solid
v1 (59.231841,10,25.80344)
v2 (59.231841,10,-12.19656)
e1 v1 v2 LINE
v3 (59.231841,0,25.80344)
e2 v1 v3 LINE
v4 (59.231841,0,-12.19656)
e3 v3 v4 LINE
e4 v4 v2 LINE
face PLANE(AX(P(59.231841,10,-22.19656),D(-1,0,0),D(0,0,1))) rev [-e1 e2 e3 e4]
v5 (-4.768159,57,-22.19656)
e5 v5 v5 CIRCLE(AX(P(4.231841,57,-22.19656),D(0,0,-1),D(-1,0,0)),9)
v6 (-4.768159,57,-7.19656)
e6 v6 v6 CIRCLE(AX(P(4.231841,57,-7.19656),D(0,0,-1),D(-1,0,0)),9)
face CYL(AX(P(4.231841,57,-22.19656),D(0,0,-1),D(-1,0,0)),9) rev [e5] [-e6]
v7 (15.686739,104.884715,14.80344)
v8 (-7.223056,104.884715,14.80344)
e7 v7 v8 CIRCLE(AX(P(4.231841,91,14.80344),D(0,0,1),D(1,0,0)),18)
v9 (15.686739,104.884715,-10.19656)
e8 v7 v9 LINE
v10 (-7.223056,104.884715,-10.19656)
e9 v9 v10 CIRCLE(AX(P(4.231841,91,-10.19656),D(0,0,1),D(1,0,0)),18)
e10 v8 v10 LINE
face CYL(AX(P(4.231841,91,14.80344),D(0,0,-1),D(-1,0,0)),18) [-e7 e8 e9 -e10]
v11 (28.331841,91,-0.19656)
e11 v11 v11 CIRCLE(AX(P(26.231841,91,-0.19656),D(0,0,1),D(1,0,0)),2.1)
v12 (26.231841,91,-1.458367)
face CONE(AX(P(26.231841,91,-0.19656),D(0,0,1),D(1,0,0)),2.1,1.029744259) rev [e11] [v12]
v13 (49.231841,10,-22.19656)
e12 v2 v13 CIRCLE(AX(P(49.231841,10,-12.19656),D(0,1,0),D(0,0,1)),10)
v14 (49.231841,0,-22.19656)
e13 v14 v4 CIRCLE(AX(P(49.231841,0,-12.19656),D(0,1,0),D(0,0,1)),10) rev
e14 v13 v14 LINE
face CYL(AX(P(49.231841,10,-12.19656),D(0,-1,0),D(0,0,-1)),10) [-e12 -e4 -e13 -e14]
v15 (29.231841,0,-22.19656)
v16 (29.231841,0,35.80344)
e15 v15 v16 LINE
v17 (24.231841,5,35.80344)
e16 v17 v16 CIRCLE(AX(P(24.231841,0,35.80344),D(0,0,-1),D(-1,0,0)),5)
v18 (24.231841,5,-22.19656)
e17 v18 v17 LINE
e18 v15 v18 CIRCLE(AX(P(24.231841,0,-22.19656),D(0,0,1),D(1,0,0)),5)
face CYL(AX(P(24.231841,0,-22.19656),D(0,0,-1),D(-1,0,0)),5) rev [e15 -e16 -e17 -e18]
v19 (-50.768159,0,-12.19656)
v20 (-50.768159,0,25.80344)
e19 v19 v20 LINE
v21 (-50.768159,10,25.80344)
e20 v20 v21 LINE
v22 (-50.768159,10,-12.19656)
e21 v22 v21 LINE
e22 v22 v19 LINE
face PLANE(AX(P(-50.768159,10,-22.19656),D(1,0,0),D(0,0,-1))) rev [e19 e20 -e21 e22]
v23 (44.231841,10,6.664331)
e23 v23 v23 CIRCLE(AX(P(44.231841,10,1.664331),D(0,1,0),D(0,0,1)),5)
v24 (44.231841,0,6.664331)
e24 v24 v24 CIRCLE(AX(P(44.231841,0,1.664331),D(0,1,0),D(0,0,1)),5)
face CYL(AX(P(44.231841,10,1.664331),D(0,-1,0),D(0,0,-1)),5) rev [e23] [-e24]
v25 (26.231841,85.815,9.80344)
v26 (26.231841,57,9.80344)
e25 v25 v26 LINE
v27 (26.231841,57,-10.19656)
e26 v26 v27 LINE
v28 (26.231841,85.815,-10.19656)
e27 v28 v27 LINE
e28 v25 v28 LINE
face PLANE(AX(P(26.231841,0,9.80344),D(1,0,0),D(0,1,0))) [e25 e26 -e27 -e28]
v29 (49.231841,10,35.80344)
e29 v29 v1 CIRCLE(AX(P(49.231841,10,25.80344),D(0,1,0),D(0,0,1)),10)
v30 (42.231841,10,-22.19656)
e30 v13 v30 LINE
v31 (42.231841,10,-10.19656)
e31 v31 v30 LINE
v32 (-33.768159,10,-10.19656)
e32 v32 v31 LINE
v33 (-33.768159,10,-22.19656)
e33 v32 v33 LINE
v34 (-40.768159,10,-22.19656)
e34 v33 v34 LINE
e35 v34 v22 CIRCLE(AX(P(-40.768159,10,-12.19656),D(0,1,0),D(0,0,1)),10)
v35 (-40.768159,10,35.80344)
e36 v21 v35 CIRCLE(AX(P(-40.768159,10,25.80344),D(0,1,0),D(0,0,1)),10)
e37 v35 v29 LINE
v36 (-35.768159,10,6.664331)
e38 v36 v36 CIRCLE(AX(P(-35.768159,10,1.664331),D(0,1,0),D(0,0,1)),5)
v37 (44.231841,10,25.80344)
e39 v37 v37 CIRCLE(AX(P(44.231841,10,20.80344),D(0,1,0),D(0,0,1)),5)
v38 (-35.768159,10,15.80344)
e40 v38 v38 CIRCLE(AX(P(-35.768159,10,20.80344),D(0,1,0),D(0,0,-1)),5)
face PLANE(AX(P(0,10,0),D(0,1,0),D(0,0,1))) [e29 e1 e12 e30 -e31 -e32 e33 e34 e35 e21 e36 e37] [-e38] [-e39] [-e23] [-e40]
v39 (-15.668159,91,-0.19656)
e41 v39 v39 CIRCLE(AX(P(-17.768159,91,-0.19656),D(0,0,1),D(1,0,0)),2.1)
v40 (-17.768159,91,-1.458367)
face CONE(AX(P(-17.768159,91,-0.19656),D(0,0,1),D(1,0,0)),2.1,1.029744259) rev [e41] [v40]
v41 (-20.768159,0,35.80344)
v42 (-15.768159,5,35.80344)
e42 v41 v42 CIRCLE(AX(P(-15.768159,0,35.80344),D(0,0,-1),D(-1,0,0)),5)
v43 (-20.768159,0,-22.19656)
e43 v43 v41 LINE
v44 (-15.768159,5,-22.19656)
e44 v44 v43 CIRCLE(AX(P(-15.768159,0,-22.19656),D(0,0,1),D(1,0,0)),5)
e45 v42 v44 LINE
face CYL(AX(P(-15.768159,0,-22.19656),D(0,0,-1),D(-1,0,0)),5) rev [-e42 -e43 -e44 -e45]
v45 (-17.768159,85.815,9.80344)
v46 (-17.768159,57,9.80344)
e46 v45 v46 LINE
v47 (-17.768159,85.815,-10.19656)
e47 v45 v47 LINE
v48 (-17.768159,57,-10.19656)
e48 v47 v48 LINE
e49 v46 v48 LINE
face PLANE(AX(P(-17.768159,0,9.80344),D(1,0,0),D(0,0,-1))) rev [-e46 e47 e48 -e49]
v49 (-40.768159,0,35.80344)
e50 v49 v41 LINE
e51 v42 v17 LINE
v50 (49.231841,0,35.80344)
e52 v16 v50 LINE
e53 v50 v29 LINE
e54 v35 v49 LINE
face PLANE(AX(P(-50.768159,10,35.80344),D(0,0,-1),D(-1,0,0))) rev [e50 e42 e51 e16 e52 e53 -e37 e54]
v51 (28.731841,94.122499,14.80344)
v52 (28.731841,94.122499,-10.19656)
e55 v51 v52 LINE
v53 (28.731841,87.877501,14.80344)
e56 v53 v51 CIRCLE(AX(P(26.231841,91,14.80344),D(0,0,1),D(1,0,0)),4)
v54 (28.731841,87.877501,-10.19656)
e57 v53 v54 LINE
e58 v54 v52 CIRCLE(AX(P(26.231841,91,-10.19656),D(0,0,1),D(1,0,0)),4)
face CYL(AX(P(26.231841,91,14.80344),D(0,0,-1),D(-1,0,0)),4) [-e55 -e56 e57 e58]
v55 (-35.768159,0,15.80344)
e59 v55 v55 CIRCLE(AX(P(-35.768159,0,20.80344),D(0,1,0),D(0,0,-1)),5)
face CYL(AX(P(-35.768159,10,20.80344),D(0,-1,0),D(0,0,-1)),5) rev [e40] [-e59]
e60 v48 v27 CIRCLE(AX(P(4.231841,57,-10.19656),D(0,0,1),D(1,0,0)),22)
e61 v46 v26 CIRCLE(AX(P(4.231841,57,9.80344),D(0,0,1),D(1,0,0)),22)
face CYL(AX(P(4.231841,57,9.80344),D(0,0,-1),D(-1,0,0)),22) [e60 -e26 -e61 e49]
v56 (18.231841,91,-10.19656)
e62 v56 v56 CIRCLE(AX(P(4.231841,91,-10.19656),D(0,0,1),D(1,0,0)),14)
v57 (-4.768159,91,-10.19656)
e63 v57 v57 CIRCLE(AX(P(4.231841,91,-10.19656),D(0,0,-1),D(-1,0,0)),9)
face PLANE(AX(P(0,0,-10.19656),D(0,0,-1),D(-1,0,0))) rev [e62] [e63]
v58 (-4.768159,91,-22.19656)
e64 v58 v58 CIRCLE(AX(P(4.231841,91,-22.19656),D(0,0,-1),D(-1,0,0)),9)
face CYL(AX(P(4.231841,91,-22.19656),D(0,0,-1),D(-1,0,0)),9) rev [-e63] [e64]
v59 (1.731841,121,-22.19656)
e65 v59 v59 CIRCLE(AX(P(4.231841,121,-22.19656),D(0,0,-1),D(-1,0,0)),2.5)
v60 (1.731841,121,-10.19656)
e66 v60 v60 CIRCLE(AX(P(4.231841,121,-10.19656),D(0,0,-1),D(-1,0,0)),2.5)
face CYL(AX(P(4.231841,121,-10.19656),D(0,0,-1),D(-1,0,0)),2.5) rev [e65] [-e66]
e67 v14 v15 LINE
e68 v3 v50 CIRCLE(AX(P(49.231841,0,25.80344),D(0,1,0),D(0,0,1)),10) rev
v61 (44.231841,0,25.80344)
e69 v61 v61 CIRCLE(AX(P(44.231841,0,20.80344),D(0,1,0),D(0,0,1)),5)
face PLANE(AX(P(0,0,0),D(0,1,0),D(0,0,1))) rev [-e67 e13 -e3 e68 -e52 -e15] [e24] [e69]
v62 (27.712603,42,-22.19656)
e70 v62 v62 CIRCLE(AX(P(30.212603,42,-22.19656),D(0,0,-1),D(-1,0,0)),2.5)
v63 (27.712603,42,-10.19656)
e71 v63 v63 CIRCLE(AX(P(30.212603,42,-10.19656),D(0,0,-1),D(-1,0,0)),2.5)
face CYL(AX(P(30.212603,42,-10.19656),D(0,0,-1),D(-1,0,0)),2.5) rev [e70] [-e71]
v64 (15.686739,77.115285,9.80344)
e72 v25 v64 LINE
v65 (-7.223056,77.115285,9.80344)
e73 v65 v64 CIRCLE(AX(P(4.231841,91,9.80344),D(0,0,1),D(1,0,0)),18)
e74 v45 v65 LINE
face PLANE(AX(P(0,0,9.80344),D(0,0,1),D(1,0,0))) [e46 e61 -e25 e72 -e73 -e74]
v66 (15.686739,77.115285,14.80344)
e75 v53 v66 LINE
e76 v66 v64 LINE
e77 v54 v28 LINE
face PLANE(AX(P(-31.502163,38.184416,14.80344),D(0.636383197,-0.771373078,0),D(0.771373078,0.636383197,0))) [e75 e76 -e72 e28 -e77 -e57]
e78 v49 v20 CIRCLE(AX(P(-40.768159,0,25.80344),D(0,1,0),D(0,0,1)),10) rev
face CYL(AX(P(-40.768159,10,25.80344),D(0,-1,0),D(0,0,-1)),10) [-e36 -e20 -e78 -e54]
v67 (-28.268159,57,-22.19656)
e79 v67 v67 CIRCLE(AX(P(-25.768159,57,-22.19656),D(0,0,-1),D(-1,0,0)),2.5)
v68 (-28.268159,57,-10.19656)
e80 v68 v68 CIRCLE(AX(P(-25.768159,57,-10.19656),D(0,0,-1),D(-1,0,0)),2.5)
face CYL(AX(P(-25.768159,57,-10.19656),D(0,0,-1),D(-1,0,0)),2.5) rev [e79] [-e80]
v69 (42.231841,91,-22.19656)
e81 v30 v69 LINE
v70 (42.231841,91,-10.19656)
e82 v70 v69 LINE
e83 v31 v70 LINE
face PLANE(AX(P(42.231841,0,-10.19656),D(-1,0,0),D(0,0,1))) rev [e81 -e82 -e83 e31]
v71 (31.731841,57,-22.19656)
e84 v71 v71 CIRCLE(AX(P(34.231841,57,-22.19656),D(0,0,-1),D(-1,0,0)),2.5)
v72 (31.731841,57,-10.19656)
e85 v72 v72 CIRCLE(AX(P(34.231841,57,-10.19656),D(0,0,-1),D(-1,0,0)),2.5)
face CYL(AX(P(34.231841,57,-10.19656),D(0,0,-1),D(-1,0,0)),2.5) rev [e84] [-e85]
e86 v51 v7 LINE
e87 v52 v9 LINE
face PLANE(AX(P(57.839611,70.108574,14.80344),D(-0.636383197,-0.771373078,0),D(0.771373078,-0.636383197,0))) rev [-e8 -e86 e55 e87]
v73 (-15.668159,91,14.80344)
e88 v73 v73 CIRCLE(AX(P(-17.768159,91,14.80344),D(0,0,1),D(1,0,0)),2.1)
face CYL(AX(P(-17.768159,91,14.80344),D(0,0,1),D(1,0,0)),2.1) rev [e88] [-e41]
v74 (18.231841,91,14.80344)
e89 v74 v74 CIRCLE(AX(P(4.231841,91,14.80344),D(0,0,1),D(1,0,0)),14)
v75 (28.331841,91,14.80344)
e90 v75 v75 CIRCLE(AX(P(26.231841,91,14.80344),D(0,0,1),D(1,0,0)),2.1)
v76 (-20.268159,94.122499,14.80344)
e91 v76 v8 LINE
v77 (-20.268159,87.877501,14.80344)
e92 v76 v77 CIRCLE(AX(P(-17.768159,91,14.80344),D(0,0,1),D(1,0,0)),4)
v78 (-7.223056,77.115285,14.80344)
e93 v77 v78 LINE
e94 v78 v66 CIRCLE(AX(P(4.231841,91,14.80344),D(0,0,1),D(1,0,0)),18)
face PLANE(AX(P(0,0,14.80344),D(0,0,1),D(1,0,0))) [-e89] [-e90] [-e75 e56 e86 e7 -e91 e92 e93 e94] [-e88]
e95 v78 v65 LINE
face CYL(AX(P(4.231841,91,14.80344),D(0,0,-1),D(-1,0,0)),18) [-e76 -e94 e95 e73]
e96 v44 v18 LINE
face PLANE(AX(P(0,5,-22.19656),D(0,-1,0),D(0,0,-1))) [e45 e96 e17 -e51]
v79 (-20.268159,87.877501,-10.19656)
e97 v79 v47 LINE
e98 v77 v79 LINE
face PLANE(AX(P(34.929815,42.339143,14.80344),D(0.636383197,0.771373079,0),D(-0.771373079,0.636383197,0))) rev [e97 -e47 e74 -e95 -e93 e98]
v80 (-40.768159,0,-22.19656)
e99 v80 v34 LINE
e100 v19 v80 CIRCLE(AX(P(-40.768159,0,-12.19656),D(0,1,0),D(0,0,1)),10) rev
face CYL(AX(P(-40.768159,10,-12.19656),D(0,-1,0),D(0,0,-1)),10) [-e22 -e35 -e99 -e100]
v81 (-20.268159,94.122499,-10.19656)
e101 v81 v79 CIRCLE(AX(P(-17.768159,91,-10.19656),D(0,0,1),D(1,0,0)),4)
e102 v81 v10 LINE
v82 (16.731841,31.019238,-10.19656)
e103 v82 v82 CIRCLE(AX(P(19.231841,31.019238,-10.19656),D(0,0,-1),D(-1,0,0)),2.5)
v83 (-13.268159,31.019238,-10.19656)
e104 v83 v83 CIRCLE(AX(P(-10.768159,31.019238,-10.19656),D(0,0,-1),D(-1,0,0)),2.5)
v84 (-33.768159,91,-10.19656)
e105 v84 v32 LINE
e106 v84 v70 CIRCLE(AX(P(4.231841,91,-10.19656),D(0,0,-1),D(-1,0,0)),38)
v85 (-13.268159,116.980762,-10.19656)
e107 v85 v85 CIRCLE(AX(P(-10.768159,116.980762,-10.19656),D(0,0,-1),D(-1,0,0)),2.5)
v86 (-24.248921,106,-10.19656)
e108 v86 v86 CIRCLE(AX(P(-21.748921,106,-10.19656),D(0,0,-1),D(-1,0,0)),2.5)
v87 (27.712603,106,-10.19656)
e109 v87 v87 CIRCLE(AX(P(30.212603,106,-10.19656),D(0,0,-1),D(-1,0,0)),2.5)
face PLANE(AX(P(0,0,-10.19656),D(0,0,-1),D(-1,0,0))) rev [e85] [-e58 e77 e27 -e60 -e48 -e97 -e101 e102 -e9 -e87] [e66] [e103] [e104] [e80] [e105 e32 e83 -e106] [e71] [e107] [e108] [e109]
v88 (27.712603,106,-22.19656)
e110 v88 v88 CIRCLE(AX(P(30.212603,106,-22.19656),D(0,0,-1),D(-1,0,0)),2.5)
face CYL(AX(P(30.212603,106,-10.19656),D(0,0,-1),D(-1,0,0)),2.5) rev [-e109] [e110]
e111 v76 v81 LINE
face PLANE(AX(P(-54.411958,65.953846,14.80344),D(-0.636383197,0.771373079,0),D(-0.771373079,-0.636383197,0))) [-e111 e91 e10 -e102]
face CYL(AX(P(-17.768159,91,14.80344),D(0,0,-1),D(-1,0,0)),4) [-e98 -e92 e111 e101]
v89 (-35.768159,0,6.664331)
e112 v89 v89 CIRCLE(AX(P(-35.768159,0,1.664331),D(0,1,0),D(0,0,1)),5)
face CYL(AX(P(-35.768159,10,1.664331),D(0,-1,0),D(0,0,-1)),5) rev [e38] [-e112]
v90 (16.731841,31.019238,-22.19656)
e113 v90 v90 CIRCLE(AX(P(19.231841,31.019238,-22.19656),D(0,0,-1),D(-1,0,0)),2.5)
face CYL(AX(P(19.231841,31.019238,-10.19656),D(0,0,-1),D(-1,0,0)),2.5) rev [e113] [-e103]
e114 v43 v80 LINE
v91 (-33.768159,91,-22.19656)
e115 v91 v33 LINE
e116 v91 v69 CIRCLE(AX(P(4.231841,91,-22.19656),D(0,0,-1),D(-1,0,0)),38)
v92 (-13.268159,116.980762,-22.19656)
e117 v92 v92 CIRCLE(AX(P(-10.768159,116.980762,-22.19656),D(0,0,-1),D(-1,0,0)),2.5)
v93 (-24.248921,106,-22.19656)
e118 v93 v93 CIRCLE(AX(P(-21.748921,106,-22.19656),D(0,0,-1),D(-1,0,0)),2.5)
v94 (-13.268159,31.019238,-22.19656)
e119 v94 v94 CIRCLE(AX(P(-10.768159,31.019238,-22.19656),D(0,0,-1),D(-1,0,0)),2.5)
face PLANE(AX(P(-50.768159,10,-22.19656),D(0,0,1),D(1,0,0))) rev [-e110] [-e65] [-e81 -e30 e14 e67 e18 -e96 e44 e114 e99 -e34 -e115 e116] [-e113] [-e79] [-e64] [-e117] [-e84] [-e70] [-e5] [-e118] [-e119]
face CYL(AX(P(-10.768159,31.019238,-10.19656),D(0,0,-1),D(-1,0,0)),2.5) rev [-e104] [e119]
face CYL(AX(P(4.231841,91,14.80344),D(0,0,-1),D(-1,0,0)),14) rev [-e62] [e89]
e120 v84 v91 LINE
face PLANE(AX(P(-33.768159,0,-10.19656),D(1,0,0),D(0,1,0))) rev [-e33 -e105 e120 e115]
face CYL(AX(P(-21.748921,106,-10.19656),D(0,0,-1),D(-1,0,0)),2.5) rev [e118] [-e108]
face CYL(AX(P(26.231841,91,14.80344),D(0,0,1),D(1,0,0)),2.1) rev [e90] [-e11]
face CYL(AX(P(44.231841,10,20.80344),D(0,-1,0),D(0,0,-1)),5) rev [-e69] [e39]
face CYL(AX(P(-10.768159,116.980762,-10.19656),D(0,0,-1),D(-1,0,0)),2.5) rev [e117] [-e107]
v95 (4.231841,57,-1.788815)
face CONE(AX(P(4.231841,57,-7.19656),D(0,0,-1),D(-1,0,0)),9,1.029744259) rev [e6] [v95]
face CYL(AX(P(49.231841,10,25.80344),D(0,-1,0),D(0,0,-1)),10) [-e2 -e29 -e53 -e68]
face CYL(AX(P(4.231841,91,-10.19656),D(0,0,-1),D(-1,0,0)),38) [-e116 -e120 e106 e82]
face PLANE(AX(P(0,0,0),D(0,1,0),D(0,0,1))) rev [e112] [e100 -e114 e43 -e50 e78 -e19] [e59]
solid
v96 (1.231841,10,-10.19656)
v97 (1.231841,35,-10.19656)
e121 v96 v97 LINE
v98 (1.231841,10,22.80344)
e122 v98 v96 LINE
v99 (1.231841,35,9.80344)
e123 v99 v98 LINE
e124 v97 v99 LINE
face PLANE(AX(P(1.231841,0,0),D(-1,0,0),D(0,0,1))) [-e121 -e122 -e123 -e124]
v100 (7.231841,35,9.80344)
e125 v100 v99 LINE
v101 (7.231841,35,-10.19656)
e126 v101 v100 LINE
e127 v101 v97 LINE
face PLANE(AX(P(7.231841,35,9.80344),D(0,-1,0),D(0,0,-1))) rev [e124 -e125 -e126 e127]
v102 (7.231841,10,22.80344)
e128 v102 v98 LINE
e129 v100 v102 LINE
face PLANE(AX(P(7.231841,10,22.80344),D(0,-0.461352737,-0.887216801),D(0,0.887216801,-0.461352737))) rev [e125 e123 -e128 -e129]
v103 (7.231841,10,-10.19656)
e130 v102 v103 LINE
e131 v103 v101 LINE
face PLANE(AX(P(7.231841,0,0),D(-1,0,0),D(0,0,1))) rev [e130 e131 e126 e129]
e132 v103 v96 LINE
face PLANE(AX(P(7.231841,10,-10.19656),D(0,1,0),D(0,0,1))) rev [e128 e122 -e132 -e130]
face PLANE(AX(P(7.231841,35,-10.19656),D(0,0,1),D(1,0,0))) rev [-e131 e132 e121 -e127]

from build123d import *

# Parameters (mm, degrees)
SKETCH_1_W                  = 110
SKETCH_1_H                  = 58
SKETCH_1_R                  = 5
EXTRUDE_1_DEPTH             = 10
SKETCH_2_W                  = 25
SKETCH_2_H                  = 5
CUT_EXTRUDE_1_DEPTH         = 84.500964144
FILLET_2_R                  = 5
FILLET_3_R                  = 10
SKETCH_4_R                  = 2.5
EXTRUDE_2_DEPTH             = 12
EXTRUDE_14_DEPTH            = 20
HOLE_WIZARD_18_0_18_1_D     = 18
HOLE_WIZARD_18_0_18_1_DEPTH = 15
HOLE_WIZARD_18_0_18_1_TIP   = 5.407745571
SKETCH_7_3_R                = 14
EXTRUDE_16_DEPTH            = 25
HOLE_WIZARD_M5_1_D          = 4.2
HOLE_WIZARD_M5_1_DEPTH      = 15
HOLE_WIZARD_M5_1_TIP        = 1.2618073
EXTRUDE_19_DEPTH            = 3


with BuildPart() as part:
    # 草图1 → 凸台-拉伸1 (new body)
    with BuildSketch(Plane(origin=(0, 0, 0), x_dir=(1, 0, 0), z_dir=(0, 1, 0))):
        with Locations((4.231841208, -6.803439809)):
            Rectangle(SKETCH_1_W, SKETCH_1_H)
        with Locations(Location((44.231841208, -20.803439809, 0), (0, 0, 270))):
            Circle(SKETCH_1_R, mode=Mode.SUBTRACT)
        with Locations(Location((-35.768158792, -20.803439809, 0), (0, 0, 90))):
            Circle(SKETCH_1_R, mode=Mode.SUBTRACT)
        with Locations(Location((-35.768158792, -1.66433068, 0), (0, 0, 270))):
            Circle(SKETCH_1_R, mode=Mode.SUBTRACT)
        with Locations(Location((44.231841208, -1.66433068, 0), (0, 0, 270))):
            Circle(SKETCH_1_R, mode=Mode.SUBTRACT)
    extrude(amount=EXTRUDE_1_DEPTH)

    # 草图2 → 切除-拉伸1 (cut, through all)
    with BuildSketch(Plane.XY.offset(35.803439809)):
        with Locations((-8.268158792, 2.5)):
            Rectangle(SKETCH_2_W, SKETCH_2_H)
        with Locations((16.731841208, 2.5)):
            Rectangle(SKETCH_2_W, SKETCH_2_H)
    extrude(amount=-CUT_EXTRUDE_1_DEPTH, mode=Mode.SUBTRACT)

    # 圆角2
    fillet_2_edges = [part.edges().sort_by_distance(p)[0] for p in [
        (29.231841208, 5, 6.803439809),
        (-20.768158792, 5, 6.803439809),
    ]]
    fillet(fillet_2_edges, radius=FILLET_2_R - 0.0001)  # a hair under: the kernel refuses the full size

    # 圆角3
    fillet_3_edges = [part.edges().sort_by_distance(p)[0] for p in [
        (-50.768158792, 5, -22.196560191),
        (59.231841208, 5, -22.196560191),
        (59.231841208, 5, 35.803439809),
        (-50.768158792, 5, 35.803439809),
    ]]
    fillet(fillet_3_edges, radius=FILLET_3_R)

    # 草图4 → 凸台-拉伸2 (add)
    with BuildSketch(Plane(origin=(0, 0, -22.196560191), x_dir=(-1, 0, 0), z_dir=(0, 0, -1))):
        with BuildLine():
            Line((33.768158792, 91), (33.768158792, 10))
            Line((33.768158792, 10), (-42.231841208, 10))
            Line((-42.231841208, 10), (-42.231841208, 91))
            ThreePointArc((-42.231841208, 91), (-4.231841208, 129), (33.768158792, 91))
        make_face()
        with Locations((-4.231841208, 121)):
            Circle(SKETCH_4_R, mode=Mode.SUBTRACT)
        with Locations((10.768158792, 116.980762114)):
            Circle(SKETCH_4_R, mode=Mode.SUBTRACT)
        with Locations((-30.212603322, 106)):
            Circle(SKETCH_4_R, mode=Mode.SUBTRACT)
        with Locations((-34.231841208, 57)):
            Circle(SKETCH_4_R, mode=Mode.SUBTRACT)
        with Locations((-19.231841208, 31.019237886)):
            Circle(SKETCH_4_R, mode=Mode.SUBTRACT)
        with Locations((-30.212603322, 42)):
            Circle(SKETCH_4_R, mode=Mode.SUBTRACT)
        with Locations((25.768158792, 57)):
            Circle(SKETCH_4_R, mode=Mode.SUBTRACT)
        with Locations((10.768158792, 31.019237886)):
            Circle(SKETCH_4_R, mode=Mode.SUBTRACT)
        with Locations((21.748920905, 106)):
            Circle(SKETCH_4_R, mode=Mode.SUBTRACT)
    extrude(amount=-EXTRUDE_2_DEPTH)

    # 草图7 → 凸台-拉伸14 (add)
    with BuildSketch(Plane.XY.offset(-10.196560191)):
        with BuildLine():
            Line((-7.223056342, 77.115284587), (-17.768158792, 85.814999679))
            Line((-17.768158792, 85.814999679), (-17.768158792, 57))
            ThreePointArc((-17.768158792, 57), (4.231841208, 35), (26.231841208, 57))
            Line((26.231841208, 57), (26.231841208, 85.814999681))
            Line((26.231841208, 85.814999681), (15.68673876, 77.115284589))
            ThreePointArc((15.68673876, 77.115284589), (4.231841209, 73.000000001), (-7.223056342, 77.115284587))
        make_face()
    extrude(amount=EXTRUDE_14_DEPTH)

    # Ø18.0 (18) 直径孔1
    with Locations(Plane(origin=(4.231841208, 91, -22.196560191), x_dir=(-1, 0, 0), z_dir=(0, 0, -1))):
        with Locations((0, 0), (0, -34)):
            Hole(HOLE_WIZARD_18_0_18_1_D / 2, depth=HOLE_WIZARD_18_0_18_1_DEPTH)
            with Locations((0, 0, -(HOLE_WIZARD_18_0_18_1_DEPTH + HOLE_WIZARD_18_0_18_1_TIP / 2))):  # 118° drill point
                Cone(0, HOLE_WIZARD_18_0_18_1_D / 2, HOLE_WIZARD_18_0_18_1_TIP, mode=Mode.SUBTRACT)

    # 草图7<3> → 凸台-拉伸16 (add)
    with BuildSketch(Plane.XY.offset(-10.196560191)):
        with BuildLine():
            Line((-20.268158792, 94.122499), (-7.223056342, 104.884715413))
            ThreePointArc((-7.223056342, 104.884715413), (4.231841209, 108.999999999), (15.68673876, 104.884715411))
            Line((15.68673876, 104.884715411), (28.731841117, 94.122499073))
            ThreePointArc((28.731841117, 94.122499073), (30.231841209, 91), (28.731841117, 87.877500927))
            Line((28.731841117, 87.877500927), (15.68673876, 77.115284589))
            ThreePointArc((15.68673876, 77.115284589), (4.231841209, 73.000000001), (-7.223056342, 77.115284587))
            Line((-7.223056342, 77.115284587), (-20.268158792, 87.877501))
            ThreePointArc((-20.268158792, 87.877501), (-21.768158793, 91), (-20.268158792, 94.122499))
        make_face()
        with Locations((4.231841208, 91)):
            Circle(SKETCH_7_3_R, mode=Mode.SUBTRACT)
    extrude(amount=EXTRUDE_16_DEPTH)

    # M5 螺纹孔1
    with Locations(Plane(origin=(-17.768158792, 91, 14.803439809), x_dir=(1, 0, 0), z_dir=(0, 0, 1))):
        with Locations((0, 0), (44, 0)):
            Hole(HOLE_WIZARD_M5_1_D / 2, depth=HOLE_WIZARD_M5_1_DEPTH)
            with Locations((0, 0, -(HOLE_WIZARD_M5_1_DEPTH + HOLE_WIZARD_M5_1_TIP / 2))):  # 118° drill point
                Cone(0, HOLE_WIZARD_M5_1_D / 2, HOLE_WIZARD_M5_1_TIP, mode=Mode.SUBTRACT)


with BuildPart() as body_2:
    # 草图22 → 凸台-拉伸19 (new, symmetric)
    with BuildSketch(Plane(origin=(4.231841208, 0, 0), x_dir=(0, 0, -1), z_dir=(1, 0, 0))):
        Polygon((-9.803439809, 35), (10.196560191, 35), (10.196560191, 10), (-22.803439809, 10), align=None)
    extrude(amount=EXTRUDE_19_DEPTH, both=True)


solid = Compound([part.part, body_2.part])
